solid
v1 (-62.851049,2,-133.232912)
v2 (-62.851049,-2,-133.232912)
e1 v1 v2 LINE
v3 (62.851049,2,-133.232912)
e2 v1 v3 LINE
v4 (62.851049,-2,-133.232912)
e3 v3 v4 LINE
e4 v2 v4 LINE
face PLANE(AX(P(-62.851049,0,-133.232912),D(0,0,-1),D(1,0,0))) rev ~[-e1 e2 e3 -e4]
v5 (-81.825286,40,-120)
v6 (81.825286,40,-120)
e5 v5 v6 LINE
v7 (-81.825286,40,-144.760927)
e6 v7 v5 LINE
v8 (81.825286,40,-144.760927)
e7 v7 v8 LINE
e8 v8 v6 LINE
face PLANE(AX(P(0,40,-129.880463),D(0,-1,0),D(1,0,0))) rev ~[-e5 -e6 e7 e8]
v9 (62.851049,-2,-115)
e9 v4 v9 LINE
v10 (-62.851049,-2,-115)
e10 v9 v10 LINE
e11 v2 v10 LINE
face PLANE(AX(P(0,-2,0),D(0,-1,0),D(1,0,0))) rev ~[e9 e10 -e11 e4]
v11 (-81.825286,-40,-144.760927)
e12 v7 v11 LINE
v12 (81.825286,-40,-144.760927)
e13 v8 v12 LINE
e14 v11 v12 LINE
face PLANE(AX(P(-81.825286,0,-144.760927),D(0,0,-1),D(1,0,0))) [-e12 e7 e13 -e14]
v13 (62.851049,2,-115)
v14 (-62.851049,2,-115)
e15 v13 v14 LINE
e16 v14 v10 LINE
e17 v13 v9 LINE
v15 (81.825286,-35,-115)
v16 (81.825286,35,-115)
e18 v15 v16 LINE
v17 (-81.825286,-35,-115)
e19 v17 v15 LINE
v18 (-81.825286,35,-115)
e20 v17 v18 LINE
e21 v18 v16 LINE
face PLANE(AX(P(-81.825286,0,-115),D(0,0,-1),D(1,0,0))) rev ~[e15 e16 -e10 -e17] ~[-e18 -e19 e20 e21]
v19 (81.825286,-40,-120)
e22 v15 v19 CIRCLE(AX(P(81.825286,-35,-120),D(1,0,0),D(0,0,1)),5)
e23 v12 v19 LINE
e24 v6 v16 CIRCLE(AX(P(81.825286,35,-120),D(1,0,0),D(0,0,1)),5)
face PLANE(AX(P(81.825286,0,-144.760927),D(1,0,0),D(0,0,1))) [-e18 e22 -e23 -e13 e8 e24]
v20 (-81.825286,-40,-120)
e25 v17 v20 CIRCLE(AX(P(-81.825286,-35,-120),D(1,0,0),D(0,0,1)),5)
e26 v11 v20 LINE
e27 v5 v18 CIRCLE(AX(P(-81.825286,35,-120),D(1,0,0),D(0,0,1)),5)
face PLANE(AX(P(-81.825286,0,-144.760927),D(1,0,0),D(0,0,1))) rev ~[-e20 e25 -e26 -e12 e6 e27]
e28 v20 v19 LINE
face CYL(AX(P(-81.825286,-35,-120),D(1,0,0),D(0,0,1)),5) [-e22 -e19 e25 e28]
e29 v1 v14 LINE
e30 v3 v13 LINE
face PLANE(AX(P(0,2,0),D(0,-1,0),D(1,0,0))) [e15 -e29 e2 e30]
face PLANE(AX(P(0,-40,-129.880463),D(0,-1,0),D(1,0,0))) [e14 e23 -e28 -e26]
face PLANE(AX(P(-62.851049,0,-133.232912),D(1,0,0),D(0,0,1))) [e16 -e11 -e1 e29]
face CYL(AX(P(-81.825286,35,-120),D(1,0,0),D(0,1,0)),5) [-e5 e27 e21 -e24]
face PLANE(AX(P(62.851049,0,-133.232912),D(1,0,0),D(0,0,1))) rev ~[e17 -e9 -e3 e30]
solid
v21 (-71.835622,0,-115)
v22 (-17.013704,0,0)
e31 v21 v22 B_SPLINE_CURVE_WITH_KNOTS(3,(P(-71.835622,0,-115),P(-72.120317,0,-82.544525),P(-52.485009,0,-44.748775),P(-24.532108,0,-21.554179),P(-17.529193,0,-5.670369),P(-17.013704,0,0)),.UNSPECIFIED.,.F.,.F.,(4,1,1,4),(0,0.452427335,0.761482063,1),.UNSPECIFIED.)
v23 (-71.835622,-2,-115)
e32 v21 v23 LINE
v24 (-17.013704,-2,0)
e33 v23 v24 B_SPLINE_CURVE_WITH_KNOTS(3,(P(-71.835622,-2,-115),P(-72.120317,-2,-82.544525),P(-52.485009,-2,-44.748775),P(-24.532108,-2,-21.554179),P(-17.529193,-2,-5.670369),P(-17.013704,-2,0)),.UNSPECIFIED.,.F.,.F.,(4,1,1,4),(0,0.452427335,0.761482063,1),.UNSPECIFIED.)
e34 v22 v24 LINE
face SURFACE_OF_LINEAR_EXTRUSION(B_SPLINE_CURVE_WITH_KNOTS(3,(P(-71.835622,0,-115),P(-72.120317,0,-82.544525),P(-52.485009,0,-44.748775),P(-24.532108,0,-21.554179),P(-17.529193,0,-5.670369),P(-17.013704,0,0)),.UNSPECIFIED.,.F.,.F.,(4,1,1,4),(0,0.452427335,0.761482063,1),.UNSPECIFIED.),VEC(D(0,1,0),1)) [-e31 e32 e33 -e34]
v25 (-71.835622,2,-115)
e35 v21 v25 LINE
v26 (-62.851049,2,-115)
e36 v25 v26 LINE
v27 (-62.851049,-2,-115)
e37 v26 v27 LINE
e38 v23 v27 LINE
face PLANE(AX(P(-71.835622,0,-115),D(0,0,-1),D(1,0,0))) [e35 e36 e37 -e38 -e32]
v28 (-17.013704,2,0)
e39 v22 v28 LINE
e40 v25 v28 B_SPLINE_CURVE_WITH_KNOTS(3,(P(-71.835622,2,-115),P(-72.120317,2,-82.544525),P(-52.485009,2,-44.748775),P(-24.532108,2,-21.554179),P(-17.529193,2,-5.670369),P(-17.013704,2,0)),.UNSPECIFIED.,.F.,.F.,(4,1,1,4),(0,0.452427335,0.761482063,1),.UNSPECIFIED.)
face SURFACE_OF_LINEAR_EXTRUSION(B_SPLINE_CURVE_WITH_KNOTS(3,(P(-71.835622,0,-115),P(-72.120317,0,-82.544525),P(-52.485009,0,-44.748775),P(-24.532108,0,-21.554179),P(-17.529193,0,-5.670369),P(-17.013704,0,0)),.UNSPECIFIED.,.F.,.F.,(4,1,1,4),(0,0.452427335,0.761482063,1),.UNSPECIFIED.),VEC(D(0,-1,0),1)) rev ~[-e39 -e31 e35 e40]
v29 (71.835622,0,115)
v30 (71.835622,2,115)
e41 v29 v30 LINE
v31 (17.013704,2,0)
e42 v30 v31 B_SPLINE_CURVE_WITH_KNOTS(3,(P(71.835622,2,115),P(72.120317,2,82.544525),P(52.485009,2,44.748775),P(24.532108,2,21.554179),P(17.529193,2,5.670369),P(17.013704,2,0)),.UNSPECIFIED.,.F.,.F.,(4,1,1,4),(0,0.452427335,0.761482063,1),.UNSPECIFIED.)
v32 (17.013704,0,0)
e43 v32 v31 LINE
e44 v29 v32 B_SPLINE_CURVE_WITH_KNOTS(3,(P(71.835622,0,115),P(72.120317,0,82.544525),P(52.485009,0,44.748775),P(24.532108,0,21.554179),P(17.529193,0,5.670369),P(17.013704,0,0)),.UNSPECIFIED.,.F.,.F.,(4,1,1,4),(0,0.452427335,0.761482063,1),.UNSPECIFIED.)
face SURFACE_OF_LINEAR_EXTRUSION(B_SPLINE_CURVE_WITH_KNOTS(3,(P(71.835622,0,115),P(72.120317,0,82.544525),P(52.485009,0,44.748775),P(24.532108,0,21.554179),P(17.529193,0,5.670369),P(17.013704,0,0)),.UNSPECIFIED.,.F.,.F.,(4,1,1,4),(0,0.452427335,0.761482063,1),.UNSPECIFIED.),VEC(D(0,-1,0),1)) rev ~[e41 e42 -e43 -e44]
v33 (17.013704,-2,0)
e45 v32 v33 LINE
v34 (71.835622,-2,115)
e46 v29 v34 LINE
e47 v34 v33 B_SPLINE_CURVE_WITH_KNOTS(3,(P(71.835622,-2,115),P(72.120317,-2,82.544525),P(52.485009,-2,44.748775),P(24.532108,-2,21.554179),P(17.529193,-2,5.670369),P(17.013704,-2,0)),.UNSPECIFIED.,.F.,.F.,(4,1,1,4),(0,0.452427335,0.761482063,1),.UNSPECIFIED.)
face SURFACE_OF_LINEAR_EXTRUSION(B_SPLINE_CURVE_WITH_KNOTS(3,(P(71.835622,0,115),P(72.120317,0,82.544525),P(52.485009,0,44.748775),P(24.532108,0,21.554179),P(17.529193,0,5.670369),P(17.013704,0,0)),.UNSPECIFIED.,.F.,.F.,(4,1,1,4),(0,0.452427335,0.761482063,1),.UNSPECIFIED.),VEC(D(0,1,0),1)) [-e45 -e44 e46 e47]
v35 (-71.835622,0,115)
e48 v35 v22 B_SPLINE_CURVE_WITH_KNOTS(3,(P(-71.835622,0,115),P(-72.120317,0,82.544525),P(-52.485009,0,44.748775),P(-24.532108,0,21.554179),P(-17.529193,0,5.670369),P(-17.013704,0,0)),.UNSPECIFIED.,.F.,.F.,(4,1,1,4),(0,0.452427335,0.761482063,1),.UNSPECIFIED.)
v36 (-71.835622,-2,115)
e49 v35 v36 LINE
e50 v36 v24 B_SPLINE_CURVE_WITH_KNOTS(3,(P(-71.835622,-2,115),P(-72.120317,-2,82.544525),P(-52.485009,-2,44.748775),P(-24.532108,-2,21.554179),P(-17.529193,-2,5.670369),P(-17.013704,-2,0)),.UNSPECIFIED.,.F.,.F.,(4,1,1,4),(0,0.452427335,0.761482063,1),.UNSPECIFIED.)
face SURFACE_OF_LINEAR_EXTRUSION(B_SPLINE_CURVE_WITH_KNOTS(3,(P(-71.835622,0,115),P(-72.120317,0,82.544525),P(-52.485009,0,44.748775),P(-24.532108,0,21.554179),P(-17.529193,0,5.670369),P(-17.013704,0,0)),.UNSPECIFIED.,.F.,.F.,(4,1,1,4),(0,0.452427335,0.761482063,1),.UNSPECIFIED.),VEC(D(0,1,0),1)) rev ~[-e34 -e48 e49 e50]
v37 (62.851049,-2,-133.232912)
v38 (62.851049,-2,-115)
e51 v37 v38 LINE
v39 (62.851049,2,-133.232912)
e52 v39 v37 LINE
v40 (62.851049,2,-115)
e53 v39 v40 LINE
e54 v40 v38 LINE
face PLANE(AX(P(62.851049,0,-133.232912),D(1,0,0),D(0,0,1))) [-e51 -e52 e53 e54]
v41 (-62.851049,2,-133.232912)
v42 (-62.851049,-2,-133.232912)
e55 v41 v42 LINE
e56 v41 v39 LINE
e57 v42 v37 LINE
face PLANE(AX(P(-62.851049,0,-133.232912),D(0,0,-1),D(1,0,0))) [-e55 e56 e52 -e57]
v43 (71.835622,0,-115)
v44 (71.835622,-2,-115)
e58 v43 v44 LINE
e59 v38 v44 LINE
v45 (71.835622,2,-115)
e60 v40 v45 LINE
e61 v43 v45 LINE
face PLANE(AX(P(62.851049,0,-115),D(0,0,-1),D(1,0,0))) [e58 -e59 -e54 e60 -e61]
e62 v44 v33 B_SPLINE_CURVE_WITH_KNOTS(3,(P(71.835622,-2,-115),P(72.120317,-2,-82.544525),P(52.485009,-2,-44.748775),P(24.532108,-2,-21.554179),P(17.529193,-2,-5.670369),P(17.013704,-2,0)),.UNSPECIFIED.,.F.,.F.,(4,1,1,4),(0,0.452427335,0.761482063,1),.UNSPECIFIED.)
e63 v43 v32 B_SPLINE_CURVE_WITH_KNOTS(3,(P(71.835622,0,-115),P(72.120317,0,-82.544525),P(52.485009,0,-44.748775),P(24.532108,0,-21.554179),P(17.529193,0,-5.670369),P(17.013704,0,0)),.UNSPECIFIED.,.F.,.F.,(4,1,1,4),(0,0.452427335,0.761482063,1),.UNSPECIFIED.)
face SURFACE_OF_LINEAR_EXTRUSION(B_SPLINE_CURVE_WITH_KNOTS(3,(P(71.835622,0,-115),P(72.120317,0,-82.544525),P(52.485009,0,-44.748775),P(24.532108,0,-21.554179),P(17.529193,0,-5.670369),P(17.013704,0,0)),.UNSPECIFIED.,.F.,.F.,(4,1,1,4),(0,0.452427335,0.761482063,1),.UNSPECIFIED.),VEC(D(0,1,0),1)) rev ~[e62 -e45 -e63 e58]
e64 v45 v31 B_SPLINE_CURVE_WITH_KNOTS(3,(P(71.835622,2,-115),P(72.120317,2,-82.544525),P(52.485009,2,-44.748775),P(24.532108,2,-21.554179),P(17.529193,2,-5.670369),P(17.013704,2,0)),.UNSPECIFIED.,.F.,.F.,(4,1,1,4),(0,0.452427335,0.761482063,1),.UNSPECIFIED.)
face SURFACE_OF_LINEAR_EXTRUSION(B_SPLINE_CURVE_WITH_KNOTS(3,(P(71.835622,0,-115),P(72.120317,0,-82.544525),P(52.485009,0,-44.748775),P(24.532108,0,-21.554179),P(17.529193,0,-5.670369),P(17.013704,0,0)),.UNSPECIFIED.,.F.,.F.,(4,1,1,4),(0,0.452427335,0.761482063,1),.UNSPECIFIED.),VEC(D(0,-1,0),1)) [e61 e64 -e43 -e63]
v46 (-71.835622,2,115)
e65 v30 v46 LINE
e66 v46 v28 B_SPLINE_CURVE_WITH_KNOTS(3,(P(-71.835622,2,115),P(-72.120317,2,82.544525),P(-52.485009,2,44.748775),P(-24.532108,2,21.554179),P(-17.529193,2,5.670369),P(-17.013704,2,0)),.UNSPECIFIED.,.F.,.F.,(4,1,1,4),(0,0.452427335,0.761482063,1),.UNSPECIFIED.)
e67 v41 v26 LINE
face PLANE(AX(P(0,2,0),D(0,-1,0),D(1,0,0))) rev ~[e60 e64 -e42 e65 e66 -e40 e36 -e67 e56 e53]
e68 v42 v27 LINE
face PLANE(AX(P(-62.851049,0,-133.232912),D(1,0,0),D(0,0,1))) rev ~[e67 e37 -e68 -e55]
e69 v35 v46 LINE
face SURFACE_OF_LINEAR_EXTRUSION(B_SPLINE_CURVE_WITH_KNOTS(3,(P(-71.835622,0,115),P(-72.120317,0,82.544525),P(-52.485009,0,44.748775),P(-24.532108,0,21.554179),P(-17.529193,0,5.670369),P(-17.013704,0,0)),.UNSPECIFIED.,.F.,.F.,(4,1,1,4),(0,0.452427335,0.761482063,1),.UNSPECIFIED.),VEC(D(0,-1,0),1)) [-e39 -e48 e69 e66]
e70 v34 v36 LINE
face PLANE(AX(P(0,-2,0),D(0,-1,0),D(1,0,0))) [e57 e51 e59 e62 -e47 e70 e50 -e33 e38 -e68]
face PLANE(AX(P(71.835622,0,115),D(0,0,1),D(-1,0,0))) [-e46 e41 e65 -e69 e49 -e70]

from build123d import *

# Parameters (mm, degrees)
F0_W     = 125.702098012
F0_H     = 18.2329118252
F1_DEPTH = 2
F3_W     = 163.6505723
F3_H     = 29.7609269619
F4_DEPTH = 40
F8_R     = 5


# Not quite as in the source:
# - the program builds the solid bodies; features that only make, move or delete a surface that nothing else refers to are left out


with BuildPart() as f1:
    # F0 (on Front) → F1 (new body, symmetric)
    with BuildSketch(Plane.XZ):
        with BuildLine():
            Line((71.8356221218, 115), (-71.8356221218, 115))
            add(Edge.make_bspline(
                [(-71.8356221218, 115), (-72.1203169337, 82.5445248846), (-52.4850086356, 44.7487745495), (-24.5321077683, 21.5541787538), (-17.5291927784, 5.6703685242), (-17.0137044211, 0)],
                knots=[0, 0, 0, 0, 0.4524273346, 0.7614820627, 1, 1, 1, 1], degree=3))
            add(Edge.make_bspline(
                [(-71.8356221218, -115), (-72.1203169337, -82.5445248846), (-52.4850086356, -44.7487745495), (-24.5321077683, -21.5541787538), (-17.5291927784, -5.6703685242), (-17.0137044211, 0)],
                knots=[0, 0, 0, 0, 0.4524273346, 0.7614820627, 1, 1, 1, 1], degree=3))
            Line((-71.8356221218, -115), (-62.851049006, -115))
            Line((-62.851049006, -115), (62.851049006, -115))
            Line((62.851049006, -115), (71.8356221218, -115))
            add(Edge.make_bspline(
                [(71.8356221218, -115), (72.1203169337, -82.5445248846), (52.4850086356, -44.7487745495), (24.5321077683, -21.5541787538), (17.5291927784, -5.6703685242), (17.0137044211, 0)],
                knots=[0, 0, 0, 0, 0.4524273346, 0.7614820627, 1, 1, 1, 1], degree=3))
            add(Edge.make_bspline(
                [(71.8356221218, 115), (72.1203169337, 82.5445248846), (52.4850086356, 44.7487745495), (24.5321077683, 21.5541787538), (17.5291927784, 5.6703685242), (17.0137044211, 0)],
                knots=[0, 0, 0, 0, 0.4524273346, 0.7614820627, 1, 1, 1, 1], degree=3))
        make_face()
        with Locations((0, -124.1164559126)):
            Rectangle(F0_W, F0_H)
    extrude(amount=F1_DEPTH, both=True)


with BuildPart() as f4:
    # F3 (on Front) → F4 (new body, symmetric)
    with BuildSketch(Plane.XZ):
        with Locations((0, -129.8804634809)):
            Rectangle(F3_W, F3_H)
    extrude(amount=F4_DEPTH, both=True)

    # F5: cut F1
    add(f1.part, mode=Mode.SUBTRACT)

    # F8
    f8_edges = [f4.edges().sort_by_distance(p)[0] for p in [
        (0, -40, -115),
        (0, 40, -115),
    ]]
    fillet(f8_edges, radius=F8_R)


solid = Compound([f1.part, f4.part])
